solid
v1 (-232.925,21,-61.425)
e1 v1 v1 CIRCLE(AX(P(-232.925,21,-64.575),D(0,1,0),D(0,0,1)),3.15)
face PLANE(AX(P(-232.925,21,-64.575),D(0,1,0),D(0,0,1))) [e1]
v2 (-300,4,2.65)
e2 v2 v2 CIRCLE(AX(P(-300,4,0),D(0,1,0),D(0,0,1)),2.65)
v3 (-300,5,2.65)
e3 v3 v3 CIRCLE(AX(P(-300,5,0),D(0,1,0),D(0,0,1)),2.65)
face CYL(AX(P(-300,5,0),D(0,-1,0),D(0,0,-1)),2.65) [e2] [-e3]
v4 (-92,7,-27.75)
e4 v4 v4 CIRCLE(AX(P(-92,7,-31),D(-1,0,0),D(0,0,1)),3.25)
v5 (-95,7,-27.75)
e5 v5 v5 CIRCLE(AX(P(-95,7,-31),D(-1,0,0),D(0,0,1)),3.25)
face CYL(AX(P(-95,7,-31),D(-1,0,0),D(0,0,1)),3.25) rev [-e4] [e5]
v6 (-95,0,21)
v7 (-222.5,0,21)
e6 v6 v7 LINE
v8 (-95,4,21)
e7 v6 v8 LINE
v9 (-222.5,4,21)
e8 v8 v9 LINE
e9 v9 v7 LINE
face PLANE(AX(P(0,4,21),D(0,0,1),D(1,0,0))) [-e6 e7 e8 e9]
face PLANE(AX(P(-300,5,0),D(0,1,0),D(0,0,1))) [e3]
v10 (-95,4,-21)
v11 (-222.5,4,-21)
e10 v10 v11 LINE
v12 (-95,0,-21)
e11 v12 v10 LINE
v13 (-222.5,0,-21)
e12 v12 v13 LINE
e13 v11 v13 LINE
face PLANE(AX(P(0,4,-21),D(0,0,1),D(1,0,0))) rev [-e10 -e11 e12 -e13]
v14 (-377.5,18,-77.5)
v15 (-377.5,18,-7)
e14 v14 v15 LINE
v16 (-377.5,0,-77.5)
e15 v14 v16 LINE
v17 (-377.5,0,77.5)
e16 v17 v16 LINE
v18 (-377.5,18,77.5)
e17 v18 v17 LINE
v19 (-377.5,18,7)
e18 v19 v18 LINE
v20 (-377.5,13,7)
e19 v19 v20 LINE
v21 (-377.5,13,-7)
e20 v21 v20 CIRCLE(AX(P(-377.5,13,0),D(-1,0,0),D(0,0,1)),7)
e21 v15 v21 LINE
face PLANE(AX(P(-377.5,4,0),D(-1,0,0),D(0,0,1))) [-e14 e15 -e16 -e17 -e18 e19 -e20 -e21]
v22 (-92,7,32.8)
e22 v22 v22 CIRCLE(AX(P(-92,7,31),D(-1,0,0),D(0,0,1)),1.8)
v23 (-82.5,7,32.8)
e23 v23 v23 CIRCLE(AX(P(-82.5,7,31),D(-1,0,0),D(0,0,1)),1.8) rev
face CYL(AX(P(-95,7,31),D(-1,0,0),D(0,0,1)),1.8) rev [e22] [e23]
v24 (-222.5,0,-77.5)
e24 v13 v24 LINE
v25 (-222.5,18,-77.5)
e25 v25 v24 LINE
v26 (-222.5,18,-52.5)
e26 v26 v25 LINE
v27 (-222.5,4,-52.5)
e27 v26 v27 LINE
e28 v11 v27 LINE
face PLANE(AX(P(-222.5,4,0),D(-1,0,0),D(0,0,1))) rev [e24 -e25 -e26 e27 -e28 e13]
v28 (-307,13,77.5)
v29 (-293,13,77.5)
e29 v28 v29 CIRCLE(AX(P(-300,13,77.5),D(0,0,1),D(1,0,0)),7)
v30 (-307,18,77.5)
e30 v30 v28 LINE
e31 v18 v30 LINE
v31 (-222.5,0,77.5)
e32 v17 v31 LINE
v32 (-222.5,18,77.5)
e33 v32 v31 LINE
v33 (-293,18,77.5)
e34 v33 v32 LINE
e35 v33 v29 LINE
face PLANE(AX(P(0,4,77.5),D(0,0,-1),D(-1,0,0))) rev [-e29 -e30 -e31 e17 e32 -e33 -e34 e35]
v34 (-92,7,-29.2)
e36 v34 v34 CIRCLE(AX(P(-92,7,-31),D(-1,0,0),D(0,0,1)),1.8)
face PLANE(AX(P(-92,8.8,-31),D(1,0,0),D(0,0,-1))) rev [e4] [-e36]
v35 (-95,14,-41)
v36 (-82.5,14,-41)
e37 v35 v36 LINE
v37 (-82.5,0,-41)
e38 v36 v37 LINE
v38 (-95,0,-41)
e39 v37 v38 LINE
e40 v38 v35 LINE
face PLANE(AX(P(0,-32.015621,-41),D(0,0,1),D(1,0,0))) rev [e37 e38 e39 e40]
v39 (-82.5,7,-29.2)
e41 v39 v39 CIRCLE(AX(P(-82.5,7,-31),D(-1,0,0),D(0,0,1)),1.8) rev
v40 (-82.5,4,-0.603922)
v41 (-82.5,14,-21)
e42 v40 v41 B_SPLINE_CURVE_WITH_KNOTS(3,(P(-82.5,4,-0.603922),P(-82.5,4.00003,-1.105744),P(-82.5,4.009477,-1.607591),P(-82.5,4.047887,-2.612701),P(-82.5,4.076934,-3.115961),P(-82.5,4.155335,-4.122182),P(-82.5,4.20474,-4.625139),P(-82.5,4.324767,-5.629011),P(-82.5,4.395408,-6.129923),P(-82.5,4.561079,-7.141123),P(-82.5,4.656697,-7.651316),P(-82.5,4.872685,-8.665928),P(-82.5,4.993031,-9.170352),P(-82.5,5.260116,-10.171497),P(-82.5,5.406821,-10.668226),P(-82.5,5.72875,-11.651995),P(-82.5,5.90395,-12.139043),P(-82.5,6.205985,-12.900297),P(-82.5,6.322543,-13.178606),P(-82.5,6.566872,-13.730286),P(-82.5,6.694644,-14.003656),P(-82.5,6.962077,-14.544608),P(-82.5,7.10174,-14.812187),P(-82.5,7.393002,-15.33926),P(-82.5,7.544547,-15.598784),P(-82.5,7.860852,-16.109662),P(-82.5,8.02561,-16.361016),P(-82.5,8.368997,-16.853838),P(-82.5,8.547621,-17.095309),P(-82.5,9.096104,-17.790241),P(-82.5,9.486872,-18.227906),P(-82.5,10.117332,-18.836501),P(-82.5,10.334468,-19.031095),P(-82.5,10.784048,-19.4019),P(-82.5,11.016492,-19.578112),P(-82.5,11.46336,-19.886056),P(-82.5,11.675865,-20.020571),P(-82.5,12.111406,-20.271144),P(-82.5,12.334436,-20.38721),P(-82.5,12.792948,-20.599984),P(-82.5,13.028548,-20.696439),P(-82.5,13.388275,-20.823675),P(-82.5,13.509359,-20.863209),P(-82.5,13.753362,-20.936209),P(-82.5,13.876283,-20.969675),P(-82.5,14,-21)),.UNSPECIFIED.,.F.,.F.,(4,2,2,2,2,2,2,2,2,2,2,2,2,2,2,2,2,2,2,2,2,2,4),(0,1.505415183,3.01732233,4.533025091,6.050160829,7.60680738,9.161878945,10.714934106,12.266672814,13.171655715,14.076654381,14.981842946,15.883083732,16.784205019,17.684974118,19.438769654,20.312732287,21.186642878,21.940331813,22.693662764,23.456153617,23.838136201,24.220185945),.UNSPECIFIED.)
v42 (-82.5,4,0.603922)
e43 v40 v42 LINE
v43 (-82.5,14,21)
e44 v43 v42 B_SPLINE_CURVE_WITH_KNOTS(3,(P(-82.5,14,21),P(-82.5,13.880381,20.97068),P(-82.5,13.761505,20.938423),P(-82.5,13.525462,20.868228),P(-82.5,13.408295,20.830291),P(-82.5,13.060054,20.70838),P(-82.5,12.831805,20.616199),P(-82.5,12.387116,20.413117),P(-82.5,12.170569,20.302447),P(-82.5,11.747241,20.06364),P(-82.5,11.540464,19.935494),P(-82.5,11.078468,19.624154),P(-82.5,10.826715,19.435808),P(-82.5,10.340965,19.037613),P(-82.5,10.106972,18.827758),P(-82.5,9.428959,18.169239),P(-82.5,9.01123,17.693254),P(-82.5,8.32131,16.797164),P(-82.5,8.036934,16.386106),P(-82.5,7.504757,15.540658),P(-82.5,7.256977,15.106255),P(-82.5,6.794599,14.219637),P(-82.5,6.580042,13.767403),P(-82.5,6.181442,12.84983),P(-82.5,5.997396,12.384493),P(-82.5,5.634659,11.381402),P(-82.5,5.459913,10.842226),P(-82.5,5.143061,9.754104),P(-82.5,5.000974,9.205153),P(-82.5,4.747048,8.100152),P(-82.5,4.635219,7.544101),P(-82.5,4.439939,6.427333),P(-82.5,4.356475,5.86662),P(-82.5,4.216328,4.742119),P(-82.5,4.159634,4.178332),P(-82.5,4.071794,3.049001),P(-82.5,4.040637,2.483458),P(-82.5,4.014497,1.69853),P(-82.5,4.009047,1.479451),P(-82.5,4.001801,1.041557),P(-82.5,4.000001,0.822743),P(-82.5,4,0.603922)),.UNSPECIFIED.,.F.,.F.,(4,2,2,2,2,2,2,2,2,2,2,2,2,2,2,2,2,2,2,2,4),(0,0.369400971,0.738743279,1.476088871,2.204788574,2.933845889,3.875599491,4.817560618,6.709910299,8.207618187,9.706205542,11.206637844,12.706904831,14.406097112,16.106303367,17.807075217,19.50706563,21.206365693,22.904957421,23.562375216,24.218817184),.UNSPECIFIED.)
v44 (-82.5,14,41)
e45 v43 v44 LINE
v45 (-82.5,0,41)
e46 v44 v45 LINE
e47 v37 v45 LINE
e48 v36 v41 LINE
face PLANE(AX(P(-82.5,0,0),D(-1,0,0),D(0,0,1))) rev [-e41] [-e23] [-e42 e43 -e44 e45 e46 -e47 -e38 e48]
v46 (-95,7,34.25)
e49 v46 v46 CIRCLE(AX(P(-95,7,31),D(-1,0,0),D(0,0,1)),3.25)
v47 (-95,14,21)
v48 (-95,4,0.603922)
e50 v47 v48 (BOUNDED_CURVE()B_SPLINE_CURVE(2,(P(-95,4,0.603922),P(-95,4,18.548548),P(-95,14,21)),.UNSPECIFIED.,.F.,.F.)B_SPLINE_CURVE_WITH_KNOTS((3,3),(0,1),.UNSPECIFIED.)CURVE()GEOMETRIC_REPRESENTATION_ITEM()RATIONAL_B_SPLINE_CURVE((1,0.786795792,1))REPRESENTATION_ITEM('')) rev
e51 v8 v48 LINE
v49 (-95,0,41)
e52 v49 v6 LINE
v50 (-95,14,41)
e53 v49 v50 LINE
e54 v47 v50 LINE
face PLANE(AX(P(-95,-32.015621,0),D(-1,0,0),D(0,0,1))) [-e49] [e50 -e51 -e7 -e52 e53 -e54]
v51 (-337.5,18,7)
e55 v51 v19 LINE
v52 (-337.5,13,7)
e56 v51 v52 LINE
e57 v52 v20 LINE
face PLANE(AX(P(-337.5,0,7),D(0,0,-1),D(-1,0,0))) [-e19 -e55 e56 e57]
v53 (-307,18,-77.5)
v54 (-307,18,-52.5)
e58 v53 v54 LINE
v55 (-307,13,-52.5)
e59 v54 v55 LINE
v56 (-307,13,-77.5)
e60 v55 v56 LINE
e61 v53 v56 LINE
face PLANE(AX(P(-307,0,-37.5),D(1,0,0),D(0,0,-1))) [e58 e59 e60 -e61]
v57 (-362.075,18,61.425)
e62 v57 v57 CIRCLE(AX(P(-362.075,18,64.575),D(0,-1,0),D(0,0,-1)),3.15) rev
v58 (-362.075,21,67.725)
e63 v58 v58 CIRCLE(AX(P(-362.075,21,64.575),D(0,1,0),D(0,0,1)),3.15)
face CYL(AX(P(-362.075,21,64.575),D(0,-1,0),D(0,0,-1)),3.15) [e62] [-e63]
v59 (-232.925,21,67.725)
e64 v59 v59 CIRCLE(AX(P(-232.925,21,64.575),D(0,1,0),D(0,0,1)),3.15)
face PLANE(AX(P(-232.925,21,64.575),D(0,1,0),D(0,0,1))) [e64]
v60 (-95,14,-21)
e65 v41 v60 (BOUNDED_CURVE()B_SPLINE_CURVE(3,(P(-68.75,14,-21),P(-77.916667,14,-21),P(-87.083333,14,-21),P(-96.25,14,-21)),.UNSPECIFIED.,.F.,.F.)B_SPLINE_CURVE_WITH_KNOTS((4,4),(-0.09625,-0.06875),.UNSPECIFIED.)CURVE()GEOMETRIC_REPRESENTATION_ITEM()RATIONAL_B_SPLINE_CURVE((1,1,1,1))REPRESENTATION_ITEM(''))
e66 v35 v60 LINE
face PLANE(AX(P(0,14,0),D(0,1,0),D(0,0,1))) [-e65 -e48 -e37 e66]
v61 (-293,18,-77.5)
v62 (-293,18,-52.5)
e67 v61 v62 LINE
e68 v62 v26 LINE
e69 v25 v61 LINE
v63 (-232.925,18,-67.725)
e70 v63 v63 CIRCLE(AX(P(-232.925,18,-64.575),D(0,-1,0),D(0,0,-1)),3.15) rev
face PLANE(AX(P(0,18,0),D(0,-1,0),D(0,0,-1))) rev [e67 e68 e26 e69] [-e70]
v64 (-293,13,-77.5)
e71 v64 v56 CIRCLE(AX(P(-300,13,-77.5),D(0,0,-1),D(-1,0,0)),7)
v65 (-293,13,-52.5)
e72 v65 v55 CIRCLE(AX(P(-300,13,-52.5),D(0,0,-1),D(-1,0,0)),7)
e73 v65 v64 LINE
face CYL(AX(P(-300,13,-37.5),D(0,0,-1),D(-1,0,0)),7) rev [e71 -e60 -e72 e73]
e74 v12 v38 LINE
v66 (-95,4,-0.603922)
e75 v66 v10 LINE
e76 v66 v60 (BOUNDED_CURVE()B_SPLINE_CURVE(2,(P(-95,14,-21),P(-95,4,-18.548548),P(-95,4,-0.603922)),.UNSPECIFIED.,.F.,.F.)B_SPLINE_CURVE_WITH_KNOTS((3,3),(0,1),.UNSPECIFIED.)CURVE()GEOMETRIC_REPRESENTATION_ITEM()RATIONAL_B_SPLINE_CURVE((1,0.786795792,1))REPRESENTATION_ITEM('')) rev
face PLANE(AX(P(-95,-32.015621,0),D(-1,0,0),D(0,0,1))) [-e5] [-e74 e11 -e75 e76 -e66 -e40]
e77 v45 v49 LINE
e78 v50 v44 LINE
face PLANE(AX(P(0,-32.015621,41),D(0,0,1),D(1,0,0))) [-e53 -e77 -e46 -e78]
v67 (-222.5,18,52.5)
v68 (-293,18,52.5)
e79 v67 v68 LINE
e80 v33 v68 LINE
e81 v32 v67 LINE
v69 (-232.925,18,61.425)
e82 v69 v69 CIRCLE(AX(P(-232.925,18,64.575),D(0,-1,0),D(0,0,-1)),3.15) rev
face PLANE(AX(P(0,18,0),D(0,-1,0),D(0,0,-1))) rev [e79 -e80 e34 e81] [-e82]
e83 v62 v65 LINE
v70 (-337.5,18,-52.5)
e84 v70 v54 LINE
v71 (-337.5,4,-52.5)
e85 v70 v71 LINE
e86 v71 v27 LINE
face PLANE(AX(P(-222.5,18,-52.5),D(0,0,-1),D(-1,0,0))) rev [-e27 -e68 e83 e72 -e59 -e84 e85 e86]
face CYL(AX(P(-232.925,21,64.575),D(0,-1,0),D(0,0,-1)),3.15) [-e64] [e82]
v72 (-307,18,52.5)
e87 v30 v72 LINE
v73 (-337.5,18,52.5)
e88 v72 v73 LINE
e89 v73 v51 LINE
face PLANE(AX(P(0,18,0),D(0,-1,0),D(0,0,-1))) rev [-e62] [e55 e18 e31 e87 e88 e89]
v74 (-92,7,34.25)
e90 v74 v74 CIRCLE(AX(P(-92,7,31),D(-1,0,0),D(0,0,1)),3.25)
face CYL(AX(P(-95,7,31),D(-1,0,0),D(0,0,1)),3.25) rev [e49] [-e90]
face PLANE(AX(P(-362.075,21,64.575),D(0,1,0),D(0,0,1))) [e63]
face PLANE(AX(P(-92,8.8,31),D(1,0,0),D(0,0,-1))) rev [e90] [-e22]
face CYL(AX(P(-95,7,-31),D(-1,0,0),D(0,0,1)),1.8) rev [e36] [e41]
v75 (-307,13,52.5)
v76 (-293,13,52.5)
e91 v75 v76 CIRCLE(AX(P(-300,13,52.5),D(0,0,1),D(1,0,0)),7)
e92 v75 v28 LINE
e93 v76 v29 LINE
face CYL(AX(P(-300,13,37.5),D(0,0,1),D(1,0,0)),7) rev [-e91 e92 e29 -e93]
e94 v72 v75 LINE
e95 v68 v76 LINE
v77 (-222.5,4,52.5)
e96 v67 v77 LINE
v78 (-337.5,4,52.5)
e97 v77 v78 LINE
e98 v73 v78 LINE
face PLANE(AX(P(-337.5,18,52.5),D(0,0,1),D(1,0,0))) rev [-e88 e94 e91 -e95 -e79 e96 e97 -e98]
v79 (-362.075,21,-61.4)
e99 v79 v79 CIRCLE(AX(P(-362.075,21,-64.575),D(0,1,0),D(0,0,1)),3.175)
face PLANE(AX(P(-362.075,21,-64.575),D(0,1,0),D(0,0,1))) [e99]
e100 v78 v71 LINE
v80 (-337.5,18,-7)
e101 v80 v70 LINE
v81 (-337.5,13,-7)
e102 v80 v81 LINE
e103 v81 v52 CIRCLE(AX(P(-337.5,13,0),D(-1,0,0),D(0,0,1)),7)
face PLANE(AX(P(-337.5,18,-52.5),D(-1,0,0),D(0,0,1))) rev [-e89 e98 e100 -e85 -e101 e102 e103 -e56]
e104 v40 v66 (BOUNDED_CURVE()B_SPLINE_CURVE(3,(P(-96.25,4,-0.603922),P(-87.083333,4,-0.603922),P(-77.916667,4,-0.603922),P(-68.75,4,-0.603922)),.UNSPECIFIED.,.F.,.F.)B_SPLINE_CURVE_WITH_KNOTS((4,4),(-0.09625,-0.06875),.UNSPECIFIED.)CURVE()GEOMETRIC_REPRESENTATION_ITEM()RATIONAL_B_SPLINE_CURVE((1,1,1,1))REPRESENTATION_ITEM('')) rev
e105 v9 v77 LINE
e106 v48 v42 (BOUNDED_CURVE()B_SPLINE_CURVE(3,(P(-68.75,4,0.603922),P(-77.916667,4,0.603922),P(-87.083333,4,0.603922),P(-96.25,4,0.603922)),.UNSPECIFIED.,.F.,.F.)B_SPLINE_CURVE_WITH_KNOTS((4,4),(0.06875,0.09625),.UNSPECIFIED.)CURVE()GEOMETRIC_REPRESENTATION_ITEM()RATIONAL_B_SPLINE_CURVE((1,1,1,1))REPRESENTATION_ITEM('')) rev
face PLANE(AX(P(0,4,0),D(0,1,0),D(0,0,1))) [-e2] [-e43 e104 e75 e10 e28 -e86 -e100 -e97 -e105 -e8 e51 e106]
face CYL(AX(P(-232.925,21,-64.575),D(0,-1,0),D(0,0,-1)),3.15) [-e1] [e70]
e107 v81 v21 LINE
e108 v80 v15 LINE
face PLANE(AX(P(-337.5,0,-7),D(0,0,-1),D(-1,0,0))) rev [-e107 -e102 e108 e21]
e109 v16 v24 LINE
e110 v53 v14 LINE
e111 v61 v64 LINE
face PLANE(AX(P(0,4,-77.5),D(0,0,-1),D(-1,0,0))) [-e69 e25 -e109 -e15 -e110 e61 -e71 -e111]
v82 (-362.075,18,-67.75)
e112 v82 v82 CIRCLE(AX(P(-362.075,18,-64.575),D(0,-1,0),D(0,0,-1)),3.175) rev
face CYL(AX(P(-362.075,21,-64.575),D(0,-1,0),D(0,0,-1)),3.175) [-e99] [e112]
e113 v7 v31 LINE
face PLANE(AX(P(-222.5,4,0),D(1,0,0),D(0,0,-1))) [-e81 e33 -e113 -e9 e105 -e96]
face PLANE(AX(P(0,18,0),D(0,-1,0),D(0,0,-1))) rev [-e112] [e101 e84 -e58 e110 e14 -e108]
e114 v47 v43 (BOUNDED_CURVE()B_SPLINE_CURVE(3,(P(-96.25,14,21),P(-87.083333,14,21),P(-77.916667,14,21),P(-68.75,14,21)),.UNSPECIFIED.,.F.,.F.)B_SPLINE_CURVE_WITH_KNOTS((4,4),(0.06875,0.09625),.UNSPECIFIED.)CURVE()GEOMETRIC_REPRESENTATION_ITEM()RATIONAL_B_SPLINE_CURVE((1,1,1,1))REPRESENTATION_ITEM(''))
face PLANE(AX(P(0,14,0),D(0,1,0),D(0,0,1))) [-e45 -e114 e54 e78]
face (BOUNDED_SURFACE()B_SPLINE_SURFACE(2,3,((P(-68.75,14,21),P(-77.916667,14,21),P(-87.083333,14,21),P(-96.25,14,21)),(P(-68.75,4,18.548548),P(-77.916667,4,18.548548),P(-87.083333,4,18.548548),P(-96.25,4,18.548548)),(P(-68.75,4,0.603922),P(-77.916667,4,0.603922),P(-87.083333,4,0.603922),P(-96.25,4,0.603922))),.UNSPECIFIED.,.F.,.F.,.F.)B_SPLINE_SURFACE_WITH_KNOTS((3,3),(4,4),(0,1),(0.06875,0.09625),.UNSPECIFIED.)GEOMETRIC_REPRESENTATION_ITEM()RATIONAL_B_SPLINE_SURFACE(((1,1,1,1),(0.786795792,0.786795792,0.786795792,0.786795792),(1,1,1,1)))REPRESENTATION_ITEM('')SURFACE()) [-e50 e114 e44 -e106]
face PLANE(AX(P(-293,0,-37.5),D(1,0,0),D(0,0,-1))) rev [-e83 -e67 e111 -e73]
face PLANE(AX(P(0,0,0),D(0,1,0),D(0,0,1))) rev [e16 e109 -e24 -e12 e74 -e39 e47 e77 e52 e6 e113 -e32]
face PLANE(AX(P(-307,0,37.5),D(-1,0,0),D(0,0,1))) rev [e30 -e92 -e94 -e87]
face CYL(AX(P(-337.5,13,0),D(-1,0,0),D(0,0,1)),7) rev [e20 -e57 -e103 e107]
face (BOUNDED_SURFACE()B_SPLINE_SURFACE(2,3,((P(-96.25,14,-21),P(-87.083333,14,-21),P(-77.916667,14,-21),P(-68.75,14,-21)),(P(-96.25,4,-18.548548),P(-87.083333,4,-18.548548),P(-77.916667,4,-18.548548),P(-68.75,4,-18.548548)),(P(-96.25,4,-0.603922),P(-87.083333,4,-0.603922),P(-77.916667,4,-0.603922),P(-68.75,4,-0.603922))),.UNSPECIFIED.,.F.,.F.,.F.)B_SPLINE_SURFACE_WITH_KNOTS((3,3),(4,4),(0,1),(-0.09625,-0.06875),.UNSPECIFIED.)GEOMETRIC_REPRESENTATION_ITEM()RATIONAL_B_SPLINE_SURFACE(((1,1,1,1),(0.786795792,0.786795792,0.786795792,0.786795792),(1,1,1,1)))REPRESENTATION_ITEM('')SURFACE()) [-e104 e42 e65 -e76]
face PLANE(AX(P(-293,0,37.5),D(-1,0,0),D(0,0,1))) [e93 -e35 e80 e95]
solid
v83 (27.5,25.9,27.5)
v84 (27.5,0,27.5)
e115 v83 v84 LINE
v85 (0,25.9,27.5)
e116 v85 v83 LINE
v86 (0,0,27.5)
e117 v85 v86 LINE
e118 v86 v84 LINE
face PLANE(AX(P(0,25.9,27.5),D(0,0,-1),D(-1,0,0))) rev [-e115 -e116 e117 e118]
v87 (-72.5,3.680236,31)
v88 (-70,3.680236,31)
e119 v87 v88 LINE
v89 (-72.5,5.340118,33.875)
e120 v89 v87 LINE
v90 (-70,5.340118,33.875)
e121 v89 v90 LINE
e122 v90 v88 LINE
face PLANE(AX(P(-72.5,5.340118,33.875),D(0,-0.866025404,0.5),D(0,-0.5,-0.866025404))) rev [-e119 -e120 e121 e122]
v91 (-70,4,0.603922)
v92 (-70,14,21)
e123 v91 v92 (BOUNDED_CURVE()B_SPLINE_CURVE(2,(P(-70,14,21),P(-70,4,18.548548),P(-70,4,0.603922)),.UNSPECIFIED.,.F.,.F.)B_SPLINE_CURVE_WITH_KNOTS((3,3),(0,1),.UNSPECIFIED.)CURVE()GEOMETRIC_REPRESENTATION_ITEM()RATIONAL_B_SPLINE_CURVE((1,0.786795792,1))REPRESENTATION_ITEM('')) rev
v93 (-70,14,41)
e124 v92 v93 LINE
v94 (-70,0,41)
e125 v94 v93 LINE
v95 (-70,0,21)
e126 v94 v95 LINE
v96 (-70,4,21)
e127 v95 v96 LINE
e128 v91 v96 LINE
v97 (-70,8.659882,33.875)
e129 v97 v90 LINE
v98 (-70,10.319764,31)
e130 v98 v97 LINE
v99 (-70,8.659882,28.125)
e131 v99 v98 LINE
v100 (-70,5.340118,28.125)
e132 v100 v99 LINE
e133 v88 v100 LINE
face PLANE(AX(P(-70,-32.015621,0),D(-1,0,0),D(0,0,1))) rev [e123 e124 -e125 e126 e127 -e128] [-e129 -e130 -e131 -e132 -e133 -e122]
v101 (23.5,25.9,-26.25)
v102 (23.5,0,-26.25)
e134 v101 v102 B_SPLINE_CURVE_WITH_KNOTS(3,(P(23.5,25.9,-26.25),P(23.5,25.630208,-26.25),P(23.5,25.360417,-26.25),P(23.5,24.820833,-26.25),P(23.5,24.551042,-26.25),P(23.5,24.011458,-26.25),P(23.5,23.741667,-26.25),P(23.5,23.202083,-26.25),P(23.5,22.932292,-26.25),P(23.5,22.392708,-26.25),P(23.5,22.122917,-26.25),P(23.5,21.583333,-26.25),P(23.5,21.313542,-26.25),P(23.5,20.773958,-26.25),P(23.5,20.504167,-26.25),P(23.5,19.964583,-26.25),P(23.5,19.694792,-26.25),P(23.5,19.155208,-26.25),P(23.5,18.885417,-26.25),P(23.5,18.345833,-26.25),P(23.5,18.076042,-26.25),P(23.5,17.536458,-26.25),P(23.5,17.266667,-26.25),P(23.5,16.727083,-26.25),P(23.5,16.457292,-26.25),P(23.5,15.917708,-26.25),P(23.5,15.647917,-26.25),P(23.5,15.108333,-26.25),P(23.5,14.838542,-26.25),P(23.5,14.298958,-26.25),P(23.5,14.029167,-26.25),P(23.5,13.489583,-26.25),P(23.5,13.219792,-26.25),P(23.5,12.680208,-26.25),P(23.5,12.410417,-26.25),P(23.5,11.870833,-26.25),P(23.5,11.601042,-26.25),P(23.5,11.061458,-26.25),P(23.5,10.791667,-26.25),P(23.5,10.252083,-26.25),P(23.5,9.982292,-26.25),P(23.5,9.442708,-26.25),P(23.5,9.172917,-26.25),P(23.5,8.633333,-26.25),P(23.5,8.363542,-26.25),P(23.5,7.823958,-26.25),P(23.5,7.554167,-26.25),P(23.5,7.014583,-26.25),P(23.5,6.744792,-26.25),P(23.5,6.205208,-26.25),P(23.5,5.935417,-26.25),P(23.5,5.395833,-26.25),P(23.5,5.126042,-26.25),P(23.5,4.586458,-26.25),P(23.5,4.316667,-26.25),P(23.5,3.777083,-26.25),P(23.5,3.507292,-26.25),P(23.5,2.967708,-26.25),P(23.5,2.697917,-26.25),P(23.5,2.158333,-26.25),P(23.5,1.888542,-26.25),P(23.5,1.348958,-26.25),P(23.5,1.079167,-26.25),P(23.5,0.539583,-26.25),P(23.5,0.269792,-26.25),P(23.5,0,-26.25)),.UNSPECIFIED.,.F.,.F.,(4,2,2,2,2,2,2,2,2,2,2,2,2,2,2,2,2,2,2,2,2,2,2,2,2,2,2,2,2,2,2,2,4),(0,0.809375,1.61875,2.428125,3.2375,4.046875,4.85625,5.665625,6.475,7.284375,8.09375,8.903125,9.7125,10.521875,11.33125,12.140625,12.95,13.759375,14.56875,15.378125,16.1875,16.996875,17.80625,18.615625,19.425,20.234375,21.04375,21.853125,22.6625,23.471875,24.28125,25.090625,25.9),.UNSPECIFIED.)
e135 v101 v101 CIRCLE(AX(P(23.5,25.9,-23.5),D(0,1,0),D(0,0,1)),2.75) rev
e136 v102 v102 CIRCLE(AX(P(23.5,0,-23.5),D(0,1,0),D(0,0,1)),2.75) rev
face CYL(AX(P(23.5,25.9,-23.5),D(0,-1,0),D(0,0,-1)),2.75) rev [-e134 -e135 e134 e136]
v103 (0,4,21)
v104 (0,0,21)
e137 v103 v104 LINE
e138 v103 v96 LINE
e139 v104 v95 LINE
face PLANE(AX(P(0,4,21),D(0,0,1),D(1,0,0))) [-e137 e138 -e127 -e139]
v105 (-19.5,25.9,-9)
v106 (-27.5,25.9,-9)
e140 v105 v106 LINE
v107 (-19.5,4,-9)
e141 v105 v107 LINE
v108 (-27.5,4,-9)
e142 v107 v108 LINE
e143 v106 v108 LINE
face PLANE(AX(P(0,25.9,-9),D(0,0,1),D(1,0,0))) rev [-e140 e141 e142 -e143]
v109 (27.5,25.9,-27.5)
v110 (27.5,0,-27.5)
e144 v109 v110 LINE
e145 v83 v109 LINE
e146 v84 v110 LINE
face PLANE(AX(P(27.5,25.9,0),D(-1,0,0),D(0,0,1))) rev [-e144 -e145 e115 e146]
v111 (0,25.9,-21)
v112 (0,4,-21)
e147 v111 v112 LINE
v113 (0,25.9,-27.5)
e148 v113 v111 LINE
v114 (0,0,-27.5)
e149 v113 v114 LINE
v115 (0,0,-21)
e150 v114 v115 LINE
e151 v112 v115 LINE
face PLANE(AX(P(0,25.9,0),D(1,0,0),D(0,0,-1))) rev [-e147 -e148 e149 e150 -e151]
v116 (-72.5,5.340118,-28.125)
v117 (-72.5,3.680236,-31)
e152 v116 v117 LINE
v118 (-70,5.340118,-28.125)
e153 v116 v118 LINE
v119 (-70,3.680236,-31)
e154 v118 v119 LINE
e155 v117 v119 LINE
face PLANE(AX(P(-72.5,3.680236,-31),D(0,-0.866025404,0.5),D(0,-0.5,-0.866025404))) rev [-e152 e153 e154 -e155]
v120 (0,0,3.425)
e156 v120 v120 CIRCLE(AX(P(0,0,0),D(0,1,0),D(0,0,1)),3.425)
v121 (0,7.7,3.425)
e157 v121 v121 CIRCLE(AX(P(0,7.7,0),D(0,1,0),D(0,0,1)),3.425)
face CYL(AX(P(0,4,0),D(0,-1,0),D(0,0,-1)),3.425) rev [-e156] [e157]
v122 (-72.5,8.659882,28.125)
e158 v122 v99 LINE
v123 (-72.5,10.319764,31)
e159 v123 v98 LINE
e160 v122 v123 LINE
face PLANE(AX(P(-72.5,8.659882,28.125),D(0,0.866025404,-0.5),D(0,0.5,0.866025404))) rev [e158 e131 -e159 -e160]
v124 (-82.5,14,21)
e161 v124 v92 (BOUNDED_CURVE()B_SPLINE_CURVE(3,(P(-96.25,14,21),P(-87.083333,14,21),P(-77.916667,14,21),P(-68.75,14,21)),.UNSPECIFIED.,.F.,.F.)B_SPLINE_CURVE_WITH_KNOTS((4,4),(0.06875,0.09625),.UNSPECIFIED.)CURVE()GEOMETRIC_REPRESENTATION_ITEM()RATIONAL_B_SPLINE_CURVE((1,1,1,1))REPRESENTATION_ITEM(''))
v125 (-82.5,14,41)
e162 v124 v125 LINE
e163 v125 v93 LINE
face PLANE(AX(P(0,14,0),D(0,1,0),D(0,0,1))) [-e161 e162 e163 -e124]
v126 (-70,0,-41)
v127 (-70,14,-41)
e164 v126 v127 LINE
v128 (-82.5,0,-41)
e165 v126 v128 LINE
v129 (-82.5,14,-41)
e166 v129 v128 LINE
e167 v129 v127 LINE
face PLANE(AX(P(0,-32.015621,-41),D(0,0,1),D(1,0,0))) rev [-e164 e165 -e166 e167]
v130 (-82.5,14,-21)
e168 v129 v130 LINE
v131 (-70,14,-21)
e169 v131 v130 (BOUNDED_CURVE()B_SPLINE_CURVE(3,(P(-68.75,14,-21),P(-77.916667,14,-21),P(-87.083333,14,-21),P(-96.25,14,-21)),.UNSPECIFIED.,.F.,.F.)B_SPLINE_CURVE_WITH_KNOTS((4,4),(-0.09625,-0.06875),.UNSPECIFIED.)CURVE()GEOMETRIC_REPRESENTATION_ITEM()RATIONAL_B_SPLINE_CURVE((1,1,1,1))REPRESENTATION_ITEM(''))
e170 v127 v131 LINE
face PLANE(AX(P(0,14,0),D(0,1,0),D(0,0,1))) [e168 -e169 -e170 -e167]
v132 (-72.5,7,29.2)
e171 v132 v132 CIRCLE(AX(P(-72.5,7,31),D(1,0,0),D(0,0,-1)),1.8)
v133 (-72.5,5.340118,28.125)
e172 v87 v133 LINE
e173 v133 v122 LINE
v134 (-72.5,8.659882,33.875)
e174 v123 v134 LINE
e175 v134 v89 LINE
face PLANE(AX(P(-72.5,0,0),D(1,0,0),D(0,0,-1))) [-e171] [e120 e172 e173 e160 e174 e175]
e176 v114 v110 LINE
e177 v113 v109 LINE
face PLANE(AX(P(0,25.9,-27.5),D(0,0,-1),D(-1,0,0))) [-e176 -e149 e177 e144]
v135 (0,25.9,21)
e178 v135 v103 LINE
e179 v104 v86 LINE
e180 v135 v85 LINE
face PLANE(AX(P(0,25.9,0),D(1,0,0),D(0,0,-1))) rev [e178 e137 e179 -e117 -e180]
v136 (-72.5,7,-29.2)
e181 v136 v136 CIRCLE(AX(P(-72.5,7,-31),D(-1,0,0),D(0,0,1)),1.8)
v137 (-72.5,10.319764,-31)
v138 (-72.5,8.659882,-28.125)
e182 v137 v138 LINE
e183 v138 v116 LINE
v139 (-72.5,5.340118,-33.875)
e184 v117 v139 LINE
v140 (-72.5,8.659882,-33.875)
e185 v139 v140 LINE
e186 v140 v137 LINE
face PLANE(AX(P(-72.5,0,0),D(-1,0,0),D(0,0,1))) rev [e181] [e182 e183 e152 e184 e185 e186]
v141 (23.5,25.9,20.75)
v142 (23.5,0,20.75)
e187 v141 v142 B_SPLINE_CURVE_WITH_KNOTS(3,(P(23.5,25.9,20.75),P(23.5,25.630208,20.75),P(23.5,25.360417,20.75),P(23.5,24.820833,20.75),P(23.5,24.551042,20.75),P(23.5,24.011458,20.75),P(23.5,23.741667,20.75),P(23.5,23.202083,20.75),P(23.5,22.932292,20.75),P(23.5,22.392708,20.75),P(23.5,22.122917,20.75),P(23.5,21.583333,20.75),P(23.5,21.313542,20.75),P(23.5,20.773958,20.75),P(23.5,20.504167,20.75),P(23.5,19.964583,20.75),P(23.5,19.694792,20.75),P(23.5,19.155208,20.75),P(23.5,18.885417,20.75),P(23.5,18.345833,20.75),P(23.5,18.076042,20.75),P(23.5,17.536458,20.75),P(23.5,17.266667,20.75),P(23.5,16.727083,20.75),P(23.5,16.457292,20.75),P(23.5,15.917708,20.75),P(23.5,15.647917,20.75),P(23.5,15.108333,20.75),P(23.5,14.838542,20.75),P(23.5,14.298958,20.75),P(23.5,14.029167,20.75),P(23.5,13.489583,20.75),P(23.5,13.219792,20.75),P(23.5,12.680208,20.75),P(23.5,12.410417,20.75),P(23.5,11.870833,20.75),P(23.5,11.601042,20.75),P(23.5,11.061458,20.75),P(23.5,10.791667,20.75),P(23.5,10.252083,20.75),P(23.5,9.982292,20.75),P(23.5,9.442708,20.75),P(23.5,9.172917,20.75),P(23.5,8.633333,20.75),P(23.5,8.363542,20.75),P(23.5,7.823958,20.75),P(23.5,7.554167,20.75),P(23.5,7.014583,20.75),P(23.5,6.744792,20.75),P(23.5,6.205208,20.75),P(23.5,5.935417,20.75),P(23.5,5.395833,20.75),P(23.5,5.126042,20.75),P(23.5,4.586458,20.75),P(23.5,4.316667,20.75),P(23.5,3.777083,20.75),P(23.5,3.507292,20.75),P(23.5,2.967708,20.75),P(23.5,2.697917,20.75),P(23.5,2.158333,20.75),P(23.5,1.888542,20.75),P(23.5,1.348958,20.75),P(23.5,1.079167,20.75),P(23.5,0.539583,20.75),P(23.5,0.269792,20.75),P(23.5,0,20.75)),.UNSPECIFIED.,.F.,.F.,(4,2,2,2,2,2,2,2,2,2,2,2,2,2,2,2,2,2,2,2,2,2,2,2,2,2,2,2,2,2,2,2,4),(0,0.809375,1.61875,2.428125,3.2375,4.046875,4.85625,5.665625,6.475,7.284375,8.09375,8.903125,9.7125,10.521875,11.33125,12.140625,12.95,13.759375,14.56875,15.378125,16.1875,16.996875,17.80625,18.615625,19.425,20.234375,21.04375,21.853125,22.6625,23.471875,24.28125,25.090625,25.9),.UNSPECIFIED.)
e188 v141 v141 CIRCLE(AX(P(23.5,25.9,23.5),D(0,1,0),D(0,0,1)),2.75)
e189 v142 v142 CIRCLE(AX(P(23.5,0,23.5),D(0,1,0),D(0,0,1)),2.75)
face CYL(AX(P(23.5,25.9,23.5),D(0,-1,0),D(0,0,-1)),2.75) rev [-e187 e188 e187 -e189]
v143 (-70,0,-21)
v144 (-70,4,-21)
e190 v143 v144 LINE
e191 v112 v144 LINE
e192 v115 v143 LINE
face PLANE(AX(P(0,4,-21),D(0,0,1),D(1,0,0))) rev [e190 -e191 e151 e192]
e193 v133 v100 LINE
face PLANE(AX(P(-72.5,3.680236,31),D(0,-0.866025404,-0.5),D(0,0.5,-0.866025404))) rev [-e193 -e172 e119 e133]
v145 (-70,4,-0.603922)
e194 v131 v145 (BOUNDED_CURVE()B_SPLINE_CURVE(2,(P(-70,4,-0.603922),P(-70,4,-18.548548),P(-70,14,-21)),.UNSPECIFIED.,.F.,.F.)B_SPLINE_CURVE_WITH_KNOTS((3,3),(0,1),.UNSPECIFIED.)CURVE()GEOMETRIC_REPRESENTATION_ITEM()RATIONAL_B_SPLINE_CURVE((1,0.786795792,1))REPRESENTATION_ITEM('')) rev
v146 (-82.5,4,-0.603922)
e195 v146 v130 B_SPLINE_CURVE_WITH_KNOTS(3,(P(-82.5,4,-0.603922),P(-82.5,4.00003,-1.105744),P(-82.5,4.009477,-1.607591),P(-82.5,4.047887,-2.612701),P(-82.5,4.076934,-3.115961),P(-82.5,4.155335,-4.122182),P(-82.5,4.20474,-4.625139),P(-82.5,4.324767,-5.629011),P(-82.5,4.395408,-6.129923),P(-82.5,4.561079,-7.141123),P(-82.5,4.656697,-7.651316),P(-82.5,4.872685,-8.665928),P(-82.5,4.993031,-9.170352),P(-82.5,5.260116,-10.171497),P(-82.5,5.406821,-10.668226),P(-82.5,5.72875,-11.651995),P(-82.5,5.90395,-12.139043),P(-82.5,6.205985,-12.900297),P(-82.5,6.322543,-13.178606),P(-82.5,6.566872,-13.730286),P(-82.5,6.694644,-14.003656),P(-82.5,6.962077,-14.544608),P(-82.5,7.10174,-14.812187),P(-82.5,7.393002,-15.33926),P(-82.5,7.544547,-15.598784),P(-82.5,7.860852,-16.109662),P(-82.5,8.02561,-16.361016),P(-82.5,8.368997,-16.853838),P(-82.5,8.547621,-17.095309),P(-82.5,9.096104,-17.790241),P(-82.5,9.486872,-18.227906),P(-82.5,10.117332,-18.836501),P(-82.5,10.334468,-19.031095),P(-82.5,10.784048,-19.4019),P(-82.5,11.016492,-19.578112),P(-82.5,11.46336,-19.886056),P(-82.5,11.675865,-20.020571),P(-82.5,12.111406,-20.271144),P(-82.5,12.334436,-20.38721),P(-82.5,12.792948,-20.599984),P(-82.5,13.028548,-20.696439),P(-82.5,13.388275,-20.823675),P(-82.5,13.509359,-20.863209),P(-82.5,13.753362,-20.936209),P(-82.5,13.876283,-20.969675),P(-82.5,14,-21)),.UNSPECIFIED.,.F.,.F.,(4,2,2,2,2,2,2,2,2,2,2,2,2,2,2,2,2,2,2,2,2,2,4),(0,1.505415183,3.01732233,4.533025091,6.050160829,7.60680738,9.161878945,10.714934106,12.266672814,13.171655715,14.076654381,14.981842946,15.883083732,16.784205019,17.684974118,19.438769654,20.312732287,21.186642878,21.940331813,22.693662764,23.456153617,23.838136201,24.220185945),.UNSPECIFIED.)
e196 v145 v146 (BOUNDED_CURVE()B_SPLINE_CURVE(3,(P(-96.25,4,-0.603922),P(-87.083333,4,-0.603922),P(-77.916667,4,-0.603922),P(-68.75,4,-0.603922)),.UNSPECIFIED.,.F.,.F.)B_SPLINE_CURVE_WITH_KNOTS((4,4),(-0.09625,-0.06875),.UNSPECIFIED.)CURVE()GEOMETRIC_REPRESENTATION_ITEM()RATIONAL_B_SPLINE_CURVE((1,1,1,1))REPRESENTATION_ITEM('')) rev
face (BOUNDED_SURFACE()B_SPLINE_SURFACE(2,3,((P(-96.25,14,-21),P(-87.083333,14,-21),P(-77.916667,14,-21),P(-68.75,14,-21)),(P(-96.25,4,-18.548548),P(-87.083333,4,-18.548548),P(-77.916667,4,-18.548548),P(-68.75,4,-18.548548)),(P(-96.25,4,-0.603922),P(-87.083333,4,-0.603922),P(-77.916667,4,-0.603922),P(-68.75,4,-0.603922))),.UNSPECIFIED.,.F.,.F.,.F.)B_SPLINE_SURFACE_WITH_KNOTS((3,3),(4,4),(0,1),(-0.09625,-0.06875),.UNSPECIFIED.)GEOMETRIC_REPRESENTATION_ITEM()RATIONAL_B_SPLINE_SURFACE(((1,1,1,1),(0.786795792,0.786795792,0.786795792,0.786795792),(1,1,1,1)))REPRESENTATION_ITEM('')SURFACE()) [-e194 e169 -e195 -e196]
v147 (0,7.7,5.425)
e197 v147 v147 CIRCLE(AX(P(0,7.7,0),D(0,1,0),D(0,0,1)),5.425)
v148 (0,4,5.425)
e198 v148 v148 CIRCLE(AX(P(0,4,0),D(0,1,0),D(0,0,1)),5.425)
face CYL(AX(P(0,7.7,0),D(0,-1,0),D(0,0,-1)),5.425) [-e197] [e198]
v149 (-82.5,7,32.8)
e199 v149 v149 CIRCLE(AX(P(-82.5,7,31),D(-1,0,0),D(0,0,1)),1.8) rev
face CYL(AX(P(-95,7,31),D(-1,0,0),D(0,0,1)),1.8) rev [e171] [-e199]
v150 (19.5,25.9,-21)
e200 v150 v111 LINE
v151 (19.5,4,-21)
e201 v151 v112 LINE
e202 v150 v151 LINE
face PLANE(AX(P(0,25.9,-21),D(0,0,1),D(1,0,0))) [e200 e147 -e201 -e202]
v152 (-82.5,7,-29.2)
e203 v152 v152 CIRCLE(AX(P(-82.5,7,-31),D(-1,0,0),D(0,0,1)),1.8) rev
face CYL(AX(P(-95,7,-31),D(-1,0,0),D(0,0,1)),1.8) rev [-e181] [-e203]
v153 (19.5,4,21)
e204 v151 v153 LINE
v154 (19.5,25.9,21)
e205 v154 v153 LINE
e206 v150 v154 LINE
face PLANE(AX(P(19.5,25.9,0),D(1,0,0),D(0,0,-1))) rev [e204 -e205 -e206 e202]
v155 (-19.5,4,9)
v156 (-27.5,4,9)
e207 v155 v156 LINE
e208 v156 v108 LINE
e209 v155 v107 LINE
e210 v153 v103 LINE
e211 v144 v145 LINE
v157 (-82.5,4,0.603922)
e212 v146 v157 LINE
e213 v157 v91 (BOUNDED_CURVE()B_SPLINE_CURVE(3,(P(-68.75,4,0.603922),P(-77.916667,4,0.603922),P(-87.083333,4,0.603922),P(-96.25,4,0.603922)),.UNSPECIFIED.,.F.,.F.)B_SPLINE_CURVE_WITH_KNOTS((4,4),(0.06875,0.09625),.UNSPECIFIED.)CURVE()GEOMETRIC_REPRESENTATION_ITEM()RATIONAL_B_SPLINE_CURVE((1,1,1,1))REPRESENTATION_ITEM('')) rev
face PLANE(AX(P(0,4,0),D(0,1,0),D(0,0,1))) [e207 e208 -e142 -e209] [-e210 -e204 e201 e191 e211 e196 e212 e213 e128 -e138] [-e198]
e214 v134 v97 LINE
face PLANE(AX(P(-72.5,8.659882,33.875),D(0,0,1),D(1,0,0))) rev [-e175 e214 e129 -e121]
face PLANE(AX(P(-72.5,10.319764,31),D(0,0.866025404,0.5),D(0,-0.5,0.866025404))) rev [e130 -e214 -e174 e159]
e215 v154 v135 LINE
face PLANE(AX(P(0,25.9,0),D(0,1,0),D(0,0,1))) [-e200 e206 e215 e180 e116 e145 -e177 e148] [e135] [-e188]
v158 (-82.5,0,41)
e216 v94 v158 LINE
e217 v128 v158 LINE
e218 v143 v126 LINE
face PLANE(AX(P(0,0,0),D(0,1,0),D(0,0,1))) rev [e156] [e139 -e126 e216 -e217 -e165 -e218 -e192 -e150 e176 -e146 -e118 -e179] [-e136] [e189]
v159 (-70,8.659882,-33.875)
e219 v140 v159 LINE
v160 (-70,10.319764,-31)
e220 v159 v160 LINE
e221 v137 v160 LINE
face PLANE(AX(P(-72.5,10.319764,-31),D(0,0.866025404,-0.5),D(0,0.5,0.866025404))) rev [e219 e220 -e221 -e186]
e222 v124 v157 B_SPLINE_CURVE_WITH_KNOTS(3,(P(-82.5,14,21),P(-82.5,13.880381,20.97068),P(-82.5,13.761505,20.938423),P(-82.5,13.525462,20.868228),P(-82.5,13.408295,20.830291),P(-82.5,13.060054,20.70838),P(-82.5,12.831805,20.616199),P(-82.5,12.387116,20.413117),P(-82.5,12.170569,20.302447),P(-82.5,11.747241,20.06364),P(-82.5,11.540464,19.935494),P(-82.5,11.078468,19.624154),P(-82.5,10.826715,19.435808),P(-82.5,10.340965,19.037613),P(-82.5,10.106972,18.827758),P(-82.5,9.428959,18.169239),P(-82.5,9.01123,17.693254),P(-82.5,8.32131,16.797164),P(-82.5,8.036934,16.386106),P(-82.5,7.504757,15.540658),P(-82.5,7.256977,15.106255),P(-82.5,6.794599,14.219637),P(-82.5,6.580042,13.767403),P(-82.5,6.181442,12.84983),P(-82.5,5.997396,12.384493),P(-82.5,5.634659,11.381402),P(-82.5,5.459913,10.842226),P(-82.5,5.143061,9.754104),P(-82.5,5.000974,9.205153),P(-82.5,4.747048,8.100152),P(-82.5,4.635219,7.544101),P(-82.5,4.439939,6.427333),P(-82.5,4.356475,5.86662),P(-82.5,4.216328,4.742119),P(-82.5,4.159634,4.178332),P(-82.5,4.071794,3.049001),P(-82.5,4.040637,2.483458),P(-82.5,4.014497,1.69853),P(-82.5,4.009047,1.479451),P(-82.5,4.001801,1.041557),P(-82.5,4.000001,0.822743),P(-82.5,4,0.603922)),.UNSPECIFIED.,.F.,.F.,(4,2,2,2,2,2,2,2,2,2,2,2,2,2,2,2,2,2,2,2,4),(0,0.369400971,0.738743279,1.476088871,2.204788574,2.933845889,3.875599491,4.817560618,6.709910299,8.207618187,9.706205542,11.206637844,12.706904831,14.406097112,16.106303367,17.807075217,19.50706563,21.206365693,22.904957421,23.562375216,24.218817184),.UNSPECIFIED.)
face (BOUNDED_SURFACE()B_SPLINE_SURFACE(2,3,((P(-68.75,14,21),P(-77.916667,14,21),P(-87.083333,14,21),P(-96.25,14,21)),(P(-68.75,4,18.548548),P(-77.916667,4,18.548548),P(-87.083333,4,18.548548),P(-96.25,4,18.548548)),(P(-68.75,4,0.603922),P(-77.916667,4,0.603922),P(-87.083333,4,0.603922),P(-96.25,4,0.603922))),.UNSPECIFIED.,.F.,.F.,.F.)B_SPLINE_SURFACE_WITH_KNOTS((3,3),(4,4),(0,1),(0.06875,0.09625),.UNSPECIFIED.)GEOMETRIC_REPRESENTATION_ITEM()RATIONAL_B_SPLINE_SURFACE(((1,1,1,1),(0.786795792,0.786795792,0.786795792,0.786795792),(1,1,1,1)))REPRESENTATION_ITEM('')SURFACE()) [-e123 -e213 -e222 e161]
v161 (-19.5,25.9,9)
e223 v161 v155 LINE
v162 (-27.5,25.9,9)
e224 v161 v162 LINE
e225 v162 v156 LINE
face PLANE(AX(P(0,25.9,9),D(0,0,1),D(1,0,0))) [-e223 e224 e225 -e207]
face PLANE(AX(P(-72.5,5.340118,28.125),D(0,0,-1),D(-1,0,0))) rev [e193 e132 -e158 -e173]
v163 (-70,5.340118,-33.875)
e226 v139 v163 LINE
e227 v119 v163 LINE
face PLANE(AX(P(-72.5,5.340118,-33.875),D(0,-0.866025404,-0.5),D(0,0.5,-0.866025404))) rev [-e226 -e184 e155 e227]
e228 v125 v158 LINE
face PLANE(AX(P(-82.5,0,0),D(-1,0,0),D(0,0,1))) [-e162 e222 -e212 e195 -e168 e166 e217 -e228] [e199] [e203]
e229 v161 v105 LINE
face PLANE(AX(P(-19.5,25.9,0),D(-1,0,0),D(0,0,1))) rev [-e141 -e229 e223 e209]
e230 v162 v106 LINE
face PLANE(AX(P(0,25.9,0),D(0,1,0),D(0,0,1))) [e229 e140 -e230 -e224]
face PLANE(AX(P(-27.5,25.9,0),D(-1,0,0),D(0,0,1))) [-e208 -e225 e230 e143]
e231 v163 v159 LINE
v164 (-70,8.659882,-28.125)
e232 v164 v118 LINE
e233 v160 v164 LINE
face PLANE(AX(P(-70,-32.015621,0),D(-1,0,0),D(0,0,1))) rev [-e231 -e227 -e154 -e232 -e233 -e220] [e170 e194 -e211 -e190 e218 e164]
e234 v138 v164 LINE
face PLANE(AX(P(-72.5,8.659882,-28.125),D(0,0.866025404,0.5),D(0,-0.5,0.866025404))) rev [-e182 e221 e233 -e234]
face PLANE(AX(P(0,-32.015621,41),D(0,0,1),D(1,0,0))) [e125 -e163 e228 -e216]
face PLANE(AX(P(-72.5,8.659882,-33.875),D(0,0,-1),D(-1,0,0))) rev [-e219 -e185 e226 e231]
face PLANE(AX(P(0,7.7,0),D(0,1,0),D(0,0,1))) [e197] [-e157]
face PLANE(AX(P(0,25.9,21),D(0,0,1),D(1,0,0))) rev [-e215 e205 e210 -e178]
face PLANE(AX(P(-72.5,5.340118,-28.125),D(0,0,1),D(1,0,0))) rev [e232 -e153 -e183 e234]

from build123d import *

# Parameters (mm, degrees)
SKETCH1_W                      = 8
SKETCH1_H                      = 18
SKETCH1_R                      = 3.425
BOSS_EXTRUDE1_DEPTH            = 4
SKETCH1_3_R                    = 2.75
SKETCH1_3_W                    = 8
SKETCH1_3_H                    = 18
BOSS_EXTRUDE2_DEPTH            = 25.9
SKETCH4_R                      = 5.425
SKETCH4_R_2                    = 3.425
BOSS_EXTRUDE5_DEPTH            = 3.7
BOSS_EXTRUDE6_DEPTH            = 14
SKETCH6_R                      = 3.15
SKETCH6_R_2                    = 3.175
BOSS_EXTRUDE7_DEPTH            = 3
SKETCH7_R                      = 2.65
BOSS_EXTRUDE8_DEPTH            = 1
CUT_EXTRUDE1_DEPTH             = 40
CIRPATTERN1_COUNT              = 4
SKETCH12_W                     = 12.5
SKETCH12_H                     = 20
BOSS_EXTRUDE9_DEPTH            = 4
SKETCH12_3_W                   = 12.5
SKETCH12_3_H                   = 20
BOSS_EXTRUDE10_DEPTH           = 10
FILLET3_START                  = -95
FILLET3_DEPTH                  = 25
CUT_EXTRUDE2_DEPTH             = 2.5
CBORE_FOR_M3_SHCS1_D           = 3.6
CBORE_FOR_M3_SHCS1_DEPTH       = 22.5
CBORE_FOR_M3_SHCS1_CBORE_D     = 6.5
CBORE_FOR_M3_SHCS1_CBORE_DEPTH = 3


with BuildPart() as part:
    # Sketch1 → Boss-Extrude1 (new body)
    with BuildSketch(Plane(origin=(0, 0, 0), x_dir=(1, 0, 0), z_dir=(0, 1, 0))):
        Polygon((-222.5, -21), (0, -21), (19.5, -21), (19.5, 21), (0, 21), (-222.5, 21), (-222.5, 77.5), (-377.5, 77.5), (-377.5, -77.5), (-222.5, -77.5), align=None)
        with Locations((-23.5, 0)):
            Rectangle(SKETCH1_W, SKETCH1_H, mode=Mode.SUBTRACT)
        with Locations(Location((0, 0, 0), (0, 0, 270))):
            Circle(SKETCH1_R, mode=Mode.SUBTRACT)
    extrude(amount=BOSS_EXTRUDE1_DEPTH)

    # Sketch1<3> → Boss-Extrude2 (add)
    # profile 1 of 2: a face of its own
    with BuildSketch(Plane(origin=(0, 0, 0), x_dir=(1, 0, 0), z_dir=(0, 1, 0))):
        Polygon((27.5, -27.5), (27.5, 27.5), (0, 27.5), (0, 21), (19.5, 21), (19.5, -21), (0, -21), (0, -27.5), align=None)
        with Locations(Location((23.5, 23.5, 0), (0, 0, 90))):
            Circle(SKETCH1_3_R, mode=Mode.SUBTRACT)
        with Locations(Location((23.5, -23.5, 0), (0, 0, 90))):
            Circle(SKETCH1_3_R, mode=Mode.SUBTRACT)
    # profile 2 of 2: a face of its own
    with BuildSketch(Plane(origin=(0, 0, 0), x_dir=(1, 0, 0), z_dir=(0, 1, 0))):
        with Locations((-23.5, 0)):
            Rectangle(SKETCH1_3_W, SKETCH1_3_H)
    extrude(amount=BOSS_EXTRUDE2_DEPTH)

    # Sketch4 → Boss-Extrude5 (add)
    with BuildSketch(Plane(origin=(0, 4, 0), x_dir=(1, 0, 0), z_dir=(0, 1, 0))):
        with Locations(Location((0, 0, 0), (0, 0, 270))):
            Circle(SKETCH4_R)
        with Locations(Location((0, 0, 0), (0, 0, 270))):
            Circle(SKETCH4_R_2, mode=Mode.SUBTRACT)
    extrude(amount=BOSS_EXTRUDE5_DEPTH)

    # Sketch5 → Boss-Extrude6 (add)
    with BuildSketch(Plane(origin=(0, 4, 0), x_dir=(1, 0, 0), z_dir=(0, 1, 0))):
        Polygon((-377.5, 77.5), (-222.5, 77.5), (-222.5, 52.5), (-337.5, 52.5), (-337.5, -52.5), (-222.5, -52.5), (-222.5, -77.5), (-377.5, -77.5), align=None)
    extrude(amount=BOSS_EXTRUDE6_DEPTH)

    # Sketch6 → Boss-Extrude7 (add)
    with BuildSketch(Plane(origin=(0, 18, 0), x_dir=(1, 0, 0), z_dir=(0, 1, 0))):
        with Locations(Location((-232.925, 64.575, 0), (0, 0, 90))):
            Circle(SKETCH6_R)
        with Locations(Location((-232.925, -64.575, 0), (0, 0, 90))):
            Circle(SKETCH6_R)
        with Locations(Location((-362.075, -64.575, 0), (0, 0, 90))):
            Circle(SKETCH6_R)
        with Locations(Location((-362.075, 64.575, 0), (0, 0, 90))):
            Circle(SKETCH6_R_2)
    extrude(amount=BOSS_EXTRUDE7_DEPTH)

    # Sketch7 → Boss-Extrude8 (add)
    with BuildSketch(Plane(origin=(0, 4, 0), x_dir=(1, 0, 0), z_dir=(0, 1, 0))):
        with Locations(Location((-300, 0, 0), (0, 0, 270))):
            Circle(SKETCH7_R)
    extrude(amount=BOSS_EXTRUDE8_DEPTH)

    # Sketch9 → Cut-Extrude1 (cut)
    with BuildSketch(Plane.XY.offset(77.5)):
        with BuildLine():
            Line((-293, 18), (-307, 18))
            Line((-307, 18), (-307, 13))
            ThreePointArc((-307, 13), (-300, 6), (-293, 13))
            Line((-293, 13), (-293, 18))
        make_face()
    cut_extrude1 = extrude(amount=-CUT_EXTRUDE1_DEPTH, mode=Mode.SUBTRACT)

    # CirPattern1: Cut-Extrude1 ×4 about axis
    cirpattern1_axis = Axis((-300, 5, 0), (0, -1, 0))
    for i in range(1, CIRPATTERN1_COUNT):
        add(cut_extrude1.rotate(cirpattern1_axis, i * 360 / CIRPATTERN1_COUNT), mode=Mode.SUBTRACT)

    # Sketch12 → Boss-Extrude9 (add)
    with BuildSketch(Plane(origin=(0, 4, 0), x_dir=(1, 0, 0), z_dir=(0, 1, 0))):
        with Locations((-76.25, -31)):
            Rectangle(SKETCH12_W, SKETCH12_H)
        with Locations((-88.75, -31)):
            Rectangle(SKETCH12_W, SKETCH12_H)
        with Locations((-76.25, 31)):
            Rectangle(SKETCH12_W, SKETCH12_H)
        with Locations((-88.75, 31)):
            Rectangle(SKETCH12_W, SKETCH12_H)
    extrude(amount=-BOSS_EXTRUDE9_DEPTH)

    # Sketch12<3> → Boss-Extrude10 (add)
    with BuildSketch(Plane(origin=(0, 4, 0), x_dir=(1, 0, 0), z_dir=(0, 1, 0))):
        with Locations((-88.75, 31)):
            Rectangle(SKETCH12_3_W, SKETCH12_3_H)
        with Locations((-76.25, 31)):
            Rectangle(SKETCH12_3_W, SKETCH12_3_H)
        with Locations((-88.75, -31)):
            Rectangle(SKETCH12_3_W, SKETCH12_3_H)
        with Locations((-76.25, -31)):
            Rectangle(SKETCH12_3_W, SKETCH12_3_H)
    extrude(amount=BOSS_EXTRUDE10_DEPTH)

    # Fillet3: read off the stored shape, not the designer's step
    # Fillet3 outline → Fillet3 (add)
    with BuildSketch(Plane.YZ.offset(FILLET3_START)):
        with BuildLine():
            add(Edge.make_bspline(
                [(14, -21), (4, -18.548548311), (4, -0.603921946)],
                knots=[0, 0, 0, 1, 1, 1], degree=2, weights=[1, 0.786795792, 1]))
            Line((4, -0.603921946), (4, -21))
            Line((4, -21), (14, -21))
        make_face()
        with BuildLine():
            add(Edge.make_bspline(
                [(14, 21), (4, 18.548548311), (4, 0.603921946)],
                knots=[0, 0, 0, 1, 1, 1], degree=2, weights=[1, 0.786795792, 1]))
            Line((14, 21), (4, 21))
            Line((4, 21), (4, 0.603921946))
        make_face()
    extrude(amount=FILLET3_DEPTH)

    # Sketch14 → Cut-Extrude2 (cut)
    with BuildSketch(Plane(origin=(-70, 0, 0), x_dir=(0, 0, -1), z_dir=(1, 0, 0))):
        Polygon((-31, 3.680235952), (-28.125, 5.340117976), (-28.125, 8.659882024), (-31, 10.319764048), (-33.875, 8.659882024), (-33.875, 5.340117976), align=None)
        Polygon((33.875, 5.340117976), (31, 3.680235952), (28.125, 5.340117976), (28.125, 8.659882024), (31, 10.319764048), (33.875, 8.659882024), align=None)
    extrude(amount=-CUT_EXTRUDE2_DEPTH, mode=Mode.SUBTRACT)

    # CBORE for M3 SHCS1
    with Locations(Plane.ZY.offset(95)):
        with Locations((-31, 7), (31, 7)):
            CounterBoreHole(CBORE_FOR_M3_SHCS1_D / 2, CBORE_FOR_M3_SHCS1_CBORE_D / 2, CBORE_FOR_M3_SHCS1_CBORE_DEPTH, depth=CBORE_FOR_M3_SHCS1_DEPTH)


with BuildPart() as body_2:
    # Split1: the piece on the far side of the plane
    add(part.part)
    split(bisect_by=Plane(origin=(-82.5, 0, 0), x_dir=(0, 0, -1), z_dir=(-1, 0, 0)), keep=Keep.BOTTOM)


with BuildPart() as part_1:
    add(part.part)

    # Split1
    split(bisect_by=Plane(origin=(-82.5, 0, 0), x_dir=(0, 0, -1), z_dir=(-1, 0, 0)), keep=Keep.TOP)


solid = Compound([body_2.part, part_1.part])
